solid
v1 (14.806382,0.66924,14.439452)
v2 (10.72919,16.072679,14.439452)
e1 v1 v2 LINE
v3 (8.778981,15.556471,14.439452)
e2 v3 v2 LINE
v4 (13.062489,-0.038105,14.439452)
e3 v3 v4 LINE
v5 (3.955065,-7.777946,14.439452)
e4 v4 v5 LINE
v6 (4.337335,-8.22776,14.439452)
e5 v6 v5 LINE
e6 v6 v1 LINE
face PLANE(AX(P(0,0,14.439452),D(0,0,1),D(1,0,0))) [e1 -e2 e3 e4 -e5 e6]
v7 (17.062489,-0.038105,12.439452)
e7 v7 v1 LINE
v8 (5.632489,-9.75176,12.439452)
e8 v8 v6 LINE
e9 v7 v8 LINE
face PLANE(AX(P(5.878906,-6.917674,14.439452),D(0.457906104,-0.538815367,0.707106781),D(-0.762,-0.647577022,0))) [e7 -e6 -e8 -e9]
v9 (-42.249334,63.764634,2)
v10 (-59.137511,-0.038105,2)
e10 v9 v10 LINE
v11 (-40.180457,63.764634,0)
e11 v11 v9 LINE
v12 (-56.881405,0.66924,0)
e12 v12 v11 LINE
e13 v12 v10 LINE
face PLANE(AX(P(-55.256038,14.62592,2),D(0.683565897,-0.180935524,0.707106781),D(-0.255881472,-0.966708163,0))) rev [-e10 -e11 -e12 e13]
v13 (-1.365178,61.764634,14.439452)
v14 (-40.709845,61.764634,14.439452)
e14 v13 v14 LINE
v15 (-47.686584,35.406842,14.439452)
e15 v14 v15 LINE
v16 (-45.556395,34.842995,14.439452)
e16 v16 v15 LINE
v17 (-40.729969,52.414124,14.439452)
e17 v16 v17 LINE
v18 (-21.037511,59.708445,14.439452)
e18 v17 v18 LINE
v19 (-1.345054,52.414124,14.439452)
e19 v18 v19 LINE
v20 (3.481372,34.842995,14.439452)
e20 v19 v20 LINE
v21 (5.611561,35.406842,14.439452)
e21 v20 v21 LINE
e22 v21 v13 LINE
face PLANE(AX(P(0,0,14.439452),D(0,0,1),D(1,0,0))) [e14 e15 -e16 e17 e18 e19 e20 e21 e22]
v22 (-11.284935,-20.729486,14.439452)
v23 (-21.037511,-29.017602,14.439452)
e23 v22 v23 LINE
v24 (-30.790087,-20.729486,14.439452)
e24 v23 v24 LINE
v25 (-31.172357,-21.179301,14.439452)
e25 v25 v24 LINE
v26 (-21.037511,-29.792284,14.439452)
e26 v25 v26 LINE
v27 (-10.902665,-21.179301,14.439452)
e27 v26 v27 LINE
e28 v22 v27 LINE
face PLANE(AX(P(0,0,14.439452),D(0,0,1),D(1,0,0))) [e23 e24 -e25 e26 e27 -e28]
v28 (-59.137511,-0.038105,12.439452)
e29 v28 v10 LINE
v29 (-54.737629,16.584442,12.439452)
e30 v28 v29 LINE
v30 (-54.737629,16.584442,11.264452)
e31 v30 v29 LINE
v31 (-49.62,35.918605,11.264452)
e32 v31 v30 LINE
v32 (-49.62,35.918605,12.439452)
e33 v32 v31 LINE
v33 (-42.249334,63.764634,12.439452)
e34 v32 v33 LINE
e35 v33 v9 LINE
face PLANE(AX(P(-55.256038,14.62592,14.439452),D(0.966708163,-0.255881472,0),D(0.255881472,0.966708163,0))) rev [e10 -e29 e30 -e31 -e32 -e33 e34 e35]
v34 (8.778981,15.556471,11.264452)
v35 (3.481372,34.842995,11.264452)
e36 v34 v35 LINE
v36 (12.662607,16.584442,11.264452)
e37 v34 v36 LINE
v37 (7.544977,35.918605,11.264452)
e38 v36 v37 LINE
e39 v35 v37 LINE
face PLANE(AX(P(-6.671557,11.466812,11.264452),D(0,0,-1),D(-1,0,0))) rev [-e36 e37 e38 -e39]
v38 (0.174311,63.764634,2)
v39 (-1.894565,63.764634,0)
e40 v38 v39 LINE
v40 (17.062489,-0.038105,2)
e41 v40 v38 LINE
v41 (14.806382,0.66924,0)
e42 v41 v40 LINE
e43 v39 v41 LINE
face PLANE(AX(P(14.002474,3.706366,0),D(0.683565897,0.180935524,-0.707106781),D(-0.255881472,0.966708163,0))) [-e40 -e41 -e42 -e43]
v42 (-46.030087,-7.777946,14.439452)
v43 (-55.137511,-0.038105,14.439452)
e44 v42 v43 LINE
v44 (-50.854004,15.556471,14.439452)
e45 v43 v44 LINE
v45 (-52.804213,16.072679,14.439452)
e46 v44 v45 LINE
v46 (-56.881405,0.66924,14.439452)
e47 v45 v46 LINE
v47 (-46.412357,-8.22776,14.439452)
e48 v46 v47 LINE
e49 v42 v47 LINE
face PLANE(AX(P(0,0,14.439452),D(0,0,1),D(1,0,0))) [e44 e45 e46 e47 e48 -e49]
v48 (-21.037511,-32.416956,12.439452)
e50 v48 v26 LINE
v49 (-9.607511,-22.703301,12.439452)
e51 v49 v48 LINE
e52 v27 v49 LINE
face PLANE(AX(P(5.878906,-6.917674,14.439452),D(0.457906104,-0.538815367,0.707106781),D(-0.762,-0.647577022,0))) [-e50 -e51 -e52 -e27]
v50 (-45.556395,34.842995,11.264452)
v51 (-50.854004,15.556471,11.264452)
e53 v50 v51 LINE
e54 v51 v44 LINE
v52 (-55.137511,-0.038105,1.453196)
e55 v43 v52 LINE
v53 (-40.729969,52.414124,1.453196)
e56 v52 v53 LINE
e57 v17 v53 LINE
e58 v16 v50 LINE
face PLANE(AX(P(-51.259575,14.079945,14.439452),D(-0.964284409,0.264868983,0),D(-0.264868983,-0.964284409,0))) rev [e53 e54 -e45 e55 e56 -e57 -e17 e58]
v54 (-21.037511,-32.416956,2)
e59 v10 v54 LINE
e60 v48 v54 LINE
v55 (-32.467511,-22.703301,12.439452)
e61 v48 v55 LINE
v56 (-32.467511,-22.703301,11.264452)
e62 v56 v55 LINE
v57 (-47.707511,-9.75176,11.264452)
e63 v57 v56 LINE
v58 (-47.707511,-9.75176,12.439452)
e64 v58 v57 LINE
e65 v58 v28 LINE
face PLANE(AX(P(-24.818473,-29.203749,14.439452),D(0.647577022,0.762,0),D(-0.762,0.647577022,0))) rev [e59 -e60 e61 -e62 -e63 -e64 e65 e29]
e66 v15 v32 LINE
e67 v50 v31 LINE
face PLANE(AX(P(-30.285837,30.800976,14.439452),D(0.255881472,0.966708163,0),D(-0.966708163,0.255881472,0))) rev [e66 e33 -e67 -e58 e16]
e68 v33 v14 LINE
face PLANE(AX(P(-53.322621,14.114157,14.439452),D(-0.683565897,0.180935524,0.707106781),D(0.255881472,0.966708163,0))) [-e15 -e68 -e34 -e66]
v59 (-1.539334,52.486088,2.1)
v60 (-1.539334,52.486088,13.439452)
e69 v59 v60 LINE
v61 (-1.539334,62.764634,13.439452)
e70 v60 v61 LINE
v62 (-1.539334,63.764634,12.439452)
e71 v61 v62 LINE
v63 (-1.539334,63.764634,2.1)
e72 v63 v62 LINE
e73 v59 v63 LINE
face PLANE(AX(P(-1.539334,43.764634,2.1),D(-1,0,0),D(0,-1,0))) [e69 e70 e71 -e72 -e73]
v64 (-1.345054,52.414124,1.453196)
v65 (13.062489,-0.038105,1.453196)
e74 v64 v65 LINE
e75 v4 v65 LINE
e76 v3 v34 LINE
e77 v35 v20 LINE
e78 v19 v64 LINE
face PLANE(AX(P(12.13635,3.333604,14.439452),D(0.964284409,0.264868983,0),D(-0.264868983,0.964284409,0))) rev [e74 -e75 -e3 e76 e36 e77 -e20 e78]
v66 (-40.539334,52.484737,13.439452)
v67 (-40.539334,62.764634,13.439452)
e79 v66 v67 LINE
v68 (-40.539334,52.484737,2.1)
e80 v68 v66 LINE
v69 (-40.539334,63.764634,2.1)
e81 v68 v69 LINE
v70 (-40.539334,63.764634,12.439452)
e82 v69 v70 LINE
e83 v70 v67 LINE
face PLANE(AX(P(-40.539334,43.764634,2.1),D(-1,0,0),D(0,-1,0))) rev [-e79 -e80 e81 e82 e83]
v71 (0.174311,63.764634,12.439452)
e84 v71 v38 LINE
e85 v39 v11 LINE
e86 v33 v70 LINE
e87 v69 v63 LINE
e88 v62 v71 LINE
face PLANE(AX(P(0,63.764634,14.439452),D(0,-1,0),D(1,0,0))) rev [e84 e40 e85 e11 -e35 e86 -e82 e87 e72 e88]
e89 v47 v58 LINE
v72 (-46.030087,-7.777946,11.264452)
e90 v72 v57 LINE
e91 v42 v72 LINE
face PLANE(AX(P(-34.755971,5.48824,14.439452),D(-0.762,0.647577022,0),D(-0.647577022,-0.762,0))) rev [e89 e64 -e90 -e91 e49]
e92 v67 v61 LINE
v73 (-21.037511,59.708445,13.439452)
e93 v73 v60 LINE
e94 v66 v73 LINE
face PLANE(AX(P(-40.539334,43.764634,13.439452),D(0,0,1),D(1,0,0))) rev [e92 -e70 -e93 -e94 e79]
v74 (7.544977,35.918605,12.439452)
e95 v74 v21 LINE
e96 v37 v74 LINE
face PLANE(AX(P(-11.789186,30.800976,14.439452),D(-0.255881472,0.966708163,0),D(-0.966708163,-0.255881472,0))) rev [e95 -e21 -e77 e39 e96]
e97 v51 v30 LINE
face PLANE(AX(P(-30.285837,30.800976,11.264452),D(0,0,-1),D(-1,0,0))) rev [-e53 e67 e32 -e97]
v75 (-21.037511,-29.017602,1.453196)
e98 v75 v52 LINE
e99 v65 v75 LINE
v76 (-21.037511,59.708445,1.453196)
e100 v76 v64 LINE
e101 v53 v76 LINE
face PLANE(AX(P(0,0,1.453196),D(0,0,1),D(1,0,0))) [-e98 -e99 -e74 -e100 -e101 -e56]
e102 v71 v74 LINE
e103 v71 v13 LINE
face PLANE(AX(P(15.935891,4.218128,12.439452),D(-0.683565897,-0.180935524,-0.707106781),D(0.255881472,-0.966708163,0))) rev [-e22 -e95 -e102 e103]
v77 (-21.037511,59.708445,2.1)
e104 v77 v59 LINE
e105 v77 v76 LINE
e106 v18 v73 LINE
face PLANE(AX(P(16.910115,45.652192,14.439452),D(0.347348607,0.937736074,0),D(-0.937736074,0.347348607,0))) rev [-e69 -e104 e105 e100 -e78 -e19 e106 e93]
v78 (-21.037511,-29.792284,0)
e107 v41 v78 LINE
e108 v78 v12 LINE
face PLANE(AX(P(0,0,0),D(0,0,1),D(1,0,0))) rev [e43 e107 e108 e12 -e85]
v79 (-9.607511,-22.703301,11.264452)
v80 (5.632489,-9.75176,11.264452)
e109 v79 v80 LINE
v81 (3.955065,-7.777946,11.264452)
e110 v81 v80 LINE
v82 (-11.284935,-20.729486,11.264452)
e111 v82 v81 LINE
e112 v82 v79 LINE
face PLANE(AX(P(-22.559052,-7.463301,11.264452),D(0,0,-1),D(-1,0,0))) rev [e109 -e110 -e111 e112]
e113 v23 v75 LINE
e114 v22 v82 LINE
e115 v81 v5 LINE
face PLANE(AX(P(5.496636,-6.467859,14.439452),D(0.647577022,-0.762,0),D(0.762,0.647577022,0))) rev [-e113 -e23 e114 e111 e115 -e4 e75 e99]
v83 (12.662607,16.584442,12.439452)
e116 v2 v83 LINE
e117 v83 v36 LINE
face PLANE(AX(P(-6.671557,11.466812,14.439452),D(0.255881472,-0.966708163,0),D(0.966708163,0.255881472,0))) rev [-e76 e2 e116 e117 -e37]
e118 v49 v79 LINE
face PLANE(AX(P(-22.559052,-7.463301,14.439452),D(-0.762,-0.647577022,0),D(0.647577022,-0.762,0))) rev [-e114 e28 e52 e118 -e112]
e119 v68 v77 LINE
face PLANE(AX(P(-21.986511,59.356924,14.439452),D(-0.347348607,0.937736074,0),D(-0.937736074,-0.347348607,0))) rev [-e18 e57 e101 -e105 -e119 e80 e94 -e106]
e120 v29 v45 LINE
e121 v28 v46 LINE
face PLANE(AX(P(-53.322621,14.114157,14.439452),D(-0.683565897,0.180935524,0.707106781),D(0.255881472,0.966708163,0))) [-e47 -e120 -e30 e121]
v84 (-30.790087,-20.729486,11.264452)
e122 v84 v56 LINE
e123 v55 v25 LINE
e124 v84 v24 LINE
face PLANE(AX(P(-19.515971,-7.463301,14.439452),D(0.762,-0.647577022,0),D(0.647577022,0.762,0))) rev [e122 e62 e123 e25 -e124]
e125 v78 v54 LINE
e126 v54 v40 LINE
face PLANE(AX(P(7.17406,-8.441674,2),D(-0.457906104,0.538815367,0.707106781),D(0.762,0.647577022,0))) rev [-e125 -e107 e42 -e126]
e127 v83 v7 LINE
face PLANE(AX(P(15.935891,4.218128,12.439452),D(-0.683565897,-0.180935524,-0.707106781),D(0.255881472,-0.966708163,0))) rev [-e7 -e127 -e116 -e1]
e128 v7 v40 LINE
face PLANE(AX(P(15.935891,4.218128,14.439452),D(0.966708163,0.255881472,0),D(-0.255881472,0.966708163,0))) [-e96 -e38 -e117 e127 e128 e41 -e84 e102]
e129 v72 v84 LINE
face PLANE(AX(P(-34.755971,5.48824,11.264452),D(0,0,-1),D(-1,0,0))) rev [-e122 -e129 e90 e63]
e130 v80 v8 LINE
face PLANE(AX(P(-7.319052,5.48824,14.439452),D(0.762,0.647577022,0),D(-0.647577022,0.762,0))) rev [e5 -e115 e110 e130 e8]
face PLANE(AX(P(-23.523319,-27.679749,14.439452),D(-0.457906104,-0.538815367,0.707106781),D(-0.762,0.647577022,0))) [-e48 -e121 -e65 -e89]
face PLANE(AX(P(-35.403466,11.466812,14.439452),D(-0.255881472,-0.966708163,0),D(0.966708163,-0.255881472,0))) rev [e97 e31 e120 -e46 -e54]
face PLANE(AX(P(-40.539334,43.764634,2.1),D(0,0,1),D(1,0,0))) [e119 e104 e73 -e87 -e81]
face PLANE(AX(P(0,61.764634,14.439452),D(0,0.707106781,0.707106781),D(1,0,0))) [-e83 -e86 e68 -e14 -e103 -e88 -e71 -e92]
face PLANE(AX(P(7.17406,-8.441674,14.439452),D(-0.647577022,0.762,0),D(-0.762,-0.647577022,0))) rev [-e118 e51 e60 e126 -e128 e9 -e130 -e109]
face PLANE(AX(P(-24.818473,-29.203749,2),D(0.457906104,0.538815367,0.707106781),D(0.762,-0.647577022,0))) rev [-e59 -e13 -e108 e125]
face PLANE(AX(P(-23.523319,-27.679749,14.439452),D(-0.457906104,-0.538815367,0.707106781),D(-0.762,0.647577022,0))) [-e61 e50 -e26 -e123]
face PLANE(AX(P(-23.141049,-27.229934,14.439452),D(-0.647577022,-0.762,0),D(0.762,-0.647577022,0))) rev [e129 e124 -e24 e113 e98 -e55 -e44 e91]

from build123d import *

# Parameters (mm, degrees)
BOSS_EXTRUDE3_DEPTH = 14.43945182
BOSS_EXTRUDE4_DEPTH = 1.453195813
SKETCH3_W           = 39
SKETCH3_H           = 11.33945182
CUT_EXTRUDE2_DEPTH  = 20
SKETCH6_W           = 20
SKETCH6_H           = 3.175
CUT_EXTRUDE3_DEPTH  = 20
SKETCH5_W           = 20
SKETCH5_H           = 3.175
CUT_EXTRUDE4_DEPTH  = 20
SKETCH8_W           = 3.175
SKETCH8_H           = 20
CUT_EXTRUDE5_DEPTH  = 20
SKETCH7_W           = 3.175
SKETCH7_H           = 20
CUT_EXTRUDE6_DEPTH  = 20
CHAMFER1_SIZE       = 2
CHAMFER2_SIZE       = 2


with BuildPart() as part:
    # Sketch1 → Boss-Extrude3 (new body)
    with BuildSketch(Plane.XY):
        Polygon((-59.137511347, -0.038105162), (-21.037511347, -32.416956285), (17.062488653, -0.038105162), (0.174311479, 63.764633586), (-42.249334174, 63.764633586), align=None)
        Polygon((-21.037511347, -29.017601836), (-55.137511347, -0.038105162), (-40.729968911, 52.414123882), (-21.037511347, 59.708444624), (-1.345053783, 52.414123882), (13.062488653, -0.038105162), align=None, mode=Mode.SUBTRACT)
    extrude(amount=BOSS_EXTRUDE3_DEPTH)

    # Sketch1<5> → Boss-Extrude4 (add)
    with BuildSketch(Plane.XY):
        Polygon((-55.137511347, -0.038105162), (-40.729968911, 52.414123882), (-21.037511347, 59.708444624), (-1.345053783, 52.414123882), (13.062488653, -0.038105162), (-21.037511347, -29.017601836), align=None)
    extrude(amount=BOSS_EXTRUDE4_DEPTH)

    # Sketch3 → Cut-Extrude2 (cut)
    with BuildSketch(Plane(origin=(0, 63.764633586, 0), x_dir=(1, 0, 0), z_dir=(0, 1, 0))):
        with Locations((-21.039334174, -7.76972591)):
            Rectangle(SKETCH3_W, SKETCH3_H)
    extrude(amount=-CUT_EXTRUDE2_DEPTH, mode=Mode.SUBTRACT)

    # Sketch6 → Cut-Extrude3 (cut)
    with BuildSketch(Plane(origin=(7.174060124, -8.441673539, 0), x_dir=(0.762, 0.6475770224459791, 0), z_dir=(0.647577022445979, -0.7619999999999999, 0))):
        with Locations((-12.023059674, 12.85195182)):
            Rectangle(SKETCH6_W, SKETCH6_H)
    extrude(amount=-CUT_EXTRUDE3_DEPTH, mode=Mode.SUBTRACT)

    # Sketch5 → Cut-Extrude4 (cut)
    with BuildSketch(Plane(origin=(-24.818473342, -29.203748791, 0), x_dir=(0.762, -0.6475770224459791, 0), z_dir=(-0.647577022445979, -0.7619999999999999, 0))):
        with Locations((-20.038107619, 12.85195182)):
            Rectangle(SKETCH5_W, SKETCH5_H)
    extrude(amount=-CUT_EXTRUDE4_DEPTH, mode=Mode.SUBTRACT)

    # Sketch8 → Cut-Extrude5 (cut)
    with BuildSketch(Plane(origin=(15.935890818, 4.218128451, 0), x_dir=(0, 0, -1), z_dir=(0.9667081628497367, 0.2558814723259324, 0))):
        with Locations((-12.85195182, 22.79218871)):
            Rectangle(SKETCH8_W, SKETCH8_H)
    extrude(amount=-CUT_EXTRUDE5_DEPTH, mode=Mode.SUBTRACT)

    # Sketch7 → Cut-Extrude6 (cut)
    with BuildSketch(Plane(origin=(-55.256037606, 14.625920004, 0), x_dir=(0, 0, 1), z_dir=(-0.9667081628497369, 0.25588147232593195, 0))):
        with Locations((12.85195182, 12.025969955)):
            Rectangle(SKETCH7_W, SKETCH7_H)
    extrude(amount=-CUT_EXTRUDE6_DEPTH, mode=Mode.SUBTRACT)

    # Chamfer1
    # the kernel refuses this chamfer: 2 mm, written as the material it takes off along each edge
    with BuildSketch(Plane(origin=(-53.421537372, 21.556575571, 14.43945182), x_dir=(0.9663426668416519, -0.255784727868533, 0.027495876610586473), z_dir=(-0.255881472325932, -0.9667081628497369, 0))) as chamfer1_piece_1:
        Polygon((CHAMFER1_SIZE * 0.999621916911, -CHAMFER1_SIZE * 0.0274958766106), (-CHAMFER1_SIZE * 0.0274958766106, -CHAMFER1_SIZE * 0.999621916911), (0, 0), align=None)
    extrude(amount=27.481731952, mode=Mode.SUBTRACT)
    with BuildSketch(Plane(origin=(-63.056756221, 3.292620462, 14.43945182), x_dir=(-0.01780569790502669, -0.020951857977268146, -0.9996219169112968), z_dir=(0.762, -0.6475770224459791, 0)), Plane(origin=(-36.386756221, -19.372575324, 14.43945182), x_dir=(-0.017805697905026844, -0.020951857977268323, -0.9996219169112968), z_dir=(0.762, -0.6475770224459791, 0)), Plane(origin=(-24.956756221, -35.747681909, 14.43945182), x_dir=(0.017805697905025137, -0.020951857977266314, -0.9996219169112968), z_dir=(0.762, 0.6475770224459791, 0)), Plane(origin=(1.713243779, -13.082486123, 14.43945182), x_dir=(0.01780569790502548, -0.02095185797726672, -0.9996219169112968), z_dir=(0.762, 0.6475770224459791, 0))) as chamfer1_piece_2:
        Polygon((CHAMFER1_SIZE * 0.999621916911, CHAMFER1_SIZE * 0.0274958766106), (-CHAMFER1_SIZE * 0.0274958766106, CHAMFER1_SIZE * 0.999621916911), (0, 0), align=None)
    extrude(amount=25.286731952, mode=Mode.SUBTRACT)
    with BuildSketch(Plane(origin=(18.378580711, -5.010239036, 14.43945182), x_dir=(0.02658048836416282, 0.007035685390008962, -0.9996219169112968), z_dir=(-0.2558814723259324, 0.9667081628497367, 0))) as chamfer1_piece_3:
        Polygon((CHAMFER1_SIZE * 0.999621916911, CHAMFER1_SIZE * 0.0274958766106), (-CHAMFER1_SIZE * 0.0274958766106, CHAMFER1_SIZE * 0.999621916911), (0, 0), align=None)
    extrude(amount=27.481731952, mode=Mode.SUBTRACT)
    with BuildSketch(Plane(origin=(8.861069348, 30.946471081, 14.43945182), x_dir=(0.026580488364163036, 0.007035685390009019, -0.9996219169112968), z_dir=(-0.2558814723259324, 0.9667081628497367, 0)), Plane(origin=(-40.933242115, 68.736767459, 14.43945182), x_dir=(-0.026580488364161756, 0.007035685390008668, -0.9996219169112968), z_dir=(-0.255881472325932, -0.9667081628497369, 0))) as chamfer1_piece_4:
        Polygon((CHAMFER1_SIZE * 0.999621916911, CHAMFER1_SIZE * 0.0274958766106), (-CHAMFER1_SIZE * 0.0274958766106, CHAMFER1_SIZE * 0.999621916911), (0, 0), align=None)
    extrude(amount=39.091731952, mode=Mode.SUBTRACT)
    with BuildSketch(Plane(origin=(5.317677455, 63.764633586, 14.43945182), x_dir=(0, 0.027495876610585623, -0.9996219169112968), z_dir=(-1, 0, 0))) as chamfer1_piece_5:
        Polygon((CHAMFER1_SIZE * 0.999621916911, CHAMFER1_SIZE * 0.0274958766106), (-CHAMFER1_SIZE * 0.0274958766106, CHAMFER1_SIZE * 0.999621916911), (0, 0), align=None)
    extrude(amount=52.710377605, mode=Mode.SUBTRACT)

    # Chamfer2
    chamfer2_edges = [part.edges().sort_by_distance(p)[0] for p in [
        (-50.693422761, 31.863264212, 0),
        (8.618400066, 31.863264212, 0),
        (-1.987511347, -16.227530724, 0),
        (-40.087511347, -16.227530724, 0),
    ]]
    chamfer(chamfer2_edges, length=CHAMFER2_SIZE)


solid = part.part
